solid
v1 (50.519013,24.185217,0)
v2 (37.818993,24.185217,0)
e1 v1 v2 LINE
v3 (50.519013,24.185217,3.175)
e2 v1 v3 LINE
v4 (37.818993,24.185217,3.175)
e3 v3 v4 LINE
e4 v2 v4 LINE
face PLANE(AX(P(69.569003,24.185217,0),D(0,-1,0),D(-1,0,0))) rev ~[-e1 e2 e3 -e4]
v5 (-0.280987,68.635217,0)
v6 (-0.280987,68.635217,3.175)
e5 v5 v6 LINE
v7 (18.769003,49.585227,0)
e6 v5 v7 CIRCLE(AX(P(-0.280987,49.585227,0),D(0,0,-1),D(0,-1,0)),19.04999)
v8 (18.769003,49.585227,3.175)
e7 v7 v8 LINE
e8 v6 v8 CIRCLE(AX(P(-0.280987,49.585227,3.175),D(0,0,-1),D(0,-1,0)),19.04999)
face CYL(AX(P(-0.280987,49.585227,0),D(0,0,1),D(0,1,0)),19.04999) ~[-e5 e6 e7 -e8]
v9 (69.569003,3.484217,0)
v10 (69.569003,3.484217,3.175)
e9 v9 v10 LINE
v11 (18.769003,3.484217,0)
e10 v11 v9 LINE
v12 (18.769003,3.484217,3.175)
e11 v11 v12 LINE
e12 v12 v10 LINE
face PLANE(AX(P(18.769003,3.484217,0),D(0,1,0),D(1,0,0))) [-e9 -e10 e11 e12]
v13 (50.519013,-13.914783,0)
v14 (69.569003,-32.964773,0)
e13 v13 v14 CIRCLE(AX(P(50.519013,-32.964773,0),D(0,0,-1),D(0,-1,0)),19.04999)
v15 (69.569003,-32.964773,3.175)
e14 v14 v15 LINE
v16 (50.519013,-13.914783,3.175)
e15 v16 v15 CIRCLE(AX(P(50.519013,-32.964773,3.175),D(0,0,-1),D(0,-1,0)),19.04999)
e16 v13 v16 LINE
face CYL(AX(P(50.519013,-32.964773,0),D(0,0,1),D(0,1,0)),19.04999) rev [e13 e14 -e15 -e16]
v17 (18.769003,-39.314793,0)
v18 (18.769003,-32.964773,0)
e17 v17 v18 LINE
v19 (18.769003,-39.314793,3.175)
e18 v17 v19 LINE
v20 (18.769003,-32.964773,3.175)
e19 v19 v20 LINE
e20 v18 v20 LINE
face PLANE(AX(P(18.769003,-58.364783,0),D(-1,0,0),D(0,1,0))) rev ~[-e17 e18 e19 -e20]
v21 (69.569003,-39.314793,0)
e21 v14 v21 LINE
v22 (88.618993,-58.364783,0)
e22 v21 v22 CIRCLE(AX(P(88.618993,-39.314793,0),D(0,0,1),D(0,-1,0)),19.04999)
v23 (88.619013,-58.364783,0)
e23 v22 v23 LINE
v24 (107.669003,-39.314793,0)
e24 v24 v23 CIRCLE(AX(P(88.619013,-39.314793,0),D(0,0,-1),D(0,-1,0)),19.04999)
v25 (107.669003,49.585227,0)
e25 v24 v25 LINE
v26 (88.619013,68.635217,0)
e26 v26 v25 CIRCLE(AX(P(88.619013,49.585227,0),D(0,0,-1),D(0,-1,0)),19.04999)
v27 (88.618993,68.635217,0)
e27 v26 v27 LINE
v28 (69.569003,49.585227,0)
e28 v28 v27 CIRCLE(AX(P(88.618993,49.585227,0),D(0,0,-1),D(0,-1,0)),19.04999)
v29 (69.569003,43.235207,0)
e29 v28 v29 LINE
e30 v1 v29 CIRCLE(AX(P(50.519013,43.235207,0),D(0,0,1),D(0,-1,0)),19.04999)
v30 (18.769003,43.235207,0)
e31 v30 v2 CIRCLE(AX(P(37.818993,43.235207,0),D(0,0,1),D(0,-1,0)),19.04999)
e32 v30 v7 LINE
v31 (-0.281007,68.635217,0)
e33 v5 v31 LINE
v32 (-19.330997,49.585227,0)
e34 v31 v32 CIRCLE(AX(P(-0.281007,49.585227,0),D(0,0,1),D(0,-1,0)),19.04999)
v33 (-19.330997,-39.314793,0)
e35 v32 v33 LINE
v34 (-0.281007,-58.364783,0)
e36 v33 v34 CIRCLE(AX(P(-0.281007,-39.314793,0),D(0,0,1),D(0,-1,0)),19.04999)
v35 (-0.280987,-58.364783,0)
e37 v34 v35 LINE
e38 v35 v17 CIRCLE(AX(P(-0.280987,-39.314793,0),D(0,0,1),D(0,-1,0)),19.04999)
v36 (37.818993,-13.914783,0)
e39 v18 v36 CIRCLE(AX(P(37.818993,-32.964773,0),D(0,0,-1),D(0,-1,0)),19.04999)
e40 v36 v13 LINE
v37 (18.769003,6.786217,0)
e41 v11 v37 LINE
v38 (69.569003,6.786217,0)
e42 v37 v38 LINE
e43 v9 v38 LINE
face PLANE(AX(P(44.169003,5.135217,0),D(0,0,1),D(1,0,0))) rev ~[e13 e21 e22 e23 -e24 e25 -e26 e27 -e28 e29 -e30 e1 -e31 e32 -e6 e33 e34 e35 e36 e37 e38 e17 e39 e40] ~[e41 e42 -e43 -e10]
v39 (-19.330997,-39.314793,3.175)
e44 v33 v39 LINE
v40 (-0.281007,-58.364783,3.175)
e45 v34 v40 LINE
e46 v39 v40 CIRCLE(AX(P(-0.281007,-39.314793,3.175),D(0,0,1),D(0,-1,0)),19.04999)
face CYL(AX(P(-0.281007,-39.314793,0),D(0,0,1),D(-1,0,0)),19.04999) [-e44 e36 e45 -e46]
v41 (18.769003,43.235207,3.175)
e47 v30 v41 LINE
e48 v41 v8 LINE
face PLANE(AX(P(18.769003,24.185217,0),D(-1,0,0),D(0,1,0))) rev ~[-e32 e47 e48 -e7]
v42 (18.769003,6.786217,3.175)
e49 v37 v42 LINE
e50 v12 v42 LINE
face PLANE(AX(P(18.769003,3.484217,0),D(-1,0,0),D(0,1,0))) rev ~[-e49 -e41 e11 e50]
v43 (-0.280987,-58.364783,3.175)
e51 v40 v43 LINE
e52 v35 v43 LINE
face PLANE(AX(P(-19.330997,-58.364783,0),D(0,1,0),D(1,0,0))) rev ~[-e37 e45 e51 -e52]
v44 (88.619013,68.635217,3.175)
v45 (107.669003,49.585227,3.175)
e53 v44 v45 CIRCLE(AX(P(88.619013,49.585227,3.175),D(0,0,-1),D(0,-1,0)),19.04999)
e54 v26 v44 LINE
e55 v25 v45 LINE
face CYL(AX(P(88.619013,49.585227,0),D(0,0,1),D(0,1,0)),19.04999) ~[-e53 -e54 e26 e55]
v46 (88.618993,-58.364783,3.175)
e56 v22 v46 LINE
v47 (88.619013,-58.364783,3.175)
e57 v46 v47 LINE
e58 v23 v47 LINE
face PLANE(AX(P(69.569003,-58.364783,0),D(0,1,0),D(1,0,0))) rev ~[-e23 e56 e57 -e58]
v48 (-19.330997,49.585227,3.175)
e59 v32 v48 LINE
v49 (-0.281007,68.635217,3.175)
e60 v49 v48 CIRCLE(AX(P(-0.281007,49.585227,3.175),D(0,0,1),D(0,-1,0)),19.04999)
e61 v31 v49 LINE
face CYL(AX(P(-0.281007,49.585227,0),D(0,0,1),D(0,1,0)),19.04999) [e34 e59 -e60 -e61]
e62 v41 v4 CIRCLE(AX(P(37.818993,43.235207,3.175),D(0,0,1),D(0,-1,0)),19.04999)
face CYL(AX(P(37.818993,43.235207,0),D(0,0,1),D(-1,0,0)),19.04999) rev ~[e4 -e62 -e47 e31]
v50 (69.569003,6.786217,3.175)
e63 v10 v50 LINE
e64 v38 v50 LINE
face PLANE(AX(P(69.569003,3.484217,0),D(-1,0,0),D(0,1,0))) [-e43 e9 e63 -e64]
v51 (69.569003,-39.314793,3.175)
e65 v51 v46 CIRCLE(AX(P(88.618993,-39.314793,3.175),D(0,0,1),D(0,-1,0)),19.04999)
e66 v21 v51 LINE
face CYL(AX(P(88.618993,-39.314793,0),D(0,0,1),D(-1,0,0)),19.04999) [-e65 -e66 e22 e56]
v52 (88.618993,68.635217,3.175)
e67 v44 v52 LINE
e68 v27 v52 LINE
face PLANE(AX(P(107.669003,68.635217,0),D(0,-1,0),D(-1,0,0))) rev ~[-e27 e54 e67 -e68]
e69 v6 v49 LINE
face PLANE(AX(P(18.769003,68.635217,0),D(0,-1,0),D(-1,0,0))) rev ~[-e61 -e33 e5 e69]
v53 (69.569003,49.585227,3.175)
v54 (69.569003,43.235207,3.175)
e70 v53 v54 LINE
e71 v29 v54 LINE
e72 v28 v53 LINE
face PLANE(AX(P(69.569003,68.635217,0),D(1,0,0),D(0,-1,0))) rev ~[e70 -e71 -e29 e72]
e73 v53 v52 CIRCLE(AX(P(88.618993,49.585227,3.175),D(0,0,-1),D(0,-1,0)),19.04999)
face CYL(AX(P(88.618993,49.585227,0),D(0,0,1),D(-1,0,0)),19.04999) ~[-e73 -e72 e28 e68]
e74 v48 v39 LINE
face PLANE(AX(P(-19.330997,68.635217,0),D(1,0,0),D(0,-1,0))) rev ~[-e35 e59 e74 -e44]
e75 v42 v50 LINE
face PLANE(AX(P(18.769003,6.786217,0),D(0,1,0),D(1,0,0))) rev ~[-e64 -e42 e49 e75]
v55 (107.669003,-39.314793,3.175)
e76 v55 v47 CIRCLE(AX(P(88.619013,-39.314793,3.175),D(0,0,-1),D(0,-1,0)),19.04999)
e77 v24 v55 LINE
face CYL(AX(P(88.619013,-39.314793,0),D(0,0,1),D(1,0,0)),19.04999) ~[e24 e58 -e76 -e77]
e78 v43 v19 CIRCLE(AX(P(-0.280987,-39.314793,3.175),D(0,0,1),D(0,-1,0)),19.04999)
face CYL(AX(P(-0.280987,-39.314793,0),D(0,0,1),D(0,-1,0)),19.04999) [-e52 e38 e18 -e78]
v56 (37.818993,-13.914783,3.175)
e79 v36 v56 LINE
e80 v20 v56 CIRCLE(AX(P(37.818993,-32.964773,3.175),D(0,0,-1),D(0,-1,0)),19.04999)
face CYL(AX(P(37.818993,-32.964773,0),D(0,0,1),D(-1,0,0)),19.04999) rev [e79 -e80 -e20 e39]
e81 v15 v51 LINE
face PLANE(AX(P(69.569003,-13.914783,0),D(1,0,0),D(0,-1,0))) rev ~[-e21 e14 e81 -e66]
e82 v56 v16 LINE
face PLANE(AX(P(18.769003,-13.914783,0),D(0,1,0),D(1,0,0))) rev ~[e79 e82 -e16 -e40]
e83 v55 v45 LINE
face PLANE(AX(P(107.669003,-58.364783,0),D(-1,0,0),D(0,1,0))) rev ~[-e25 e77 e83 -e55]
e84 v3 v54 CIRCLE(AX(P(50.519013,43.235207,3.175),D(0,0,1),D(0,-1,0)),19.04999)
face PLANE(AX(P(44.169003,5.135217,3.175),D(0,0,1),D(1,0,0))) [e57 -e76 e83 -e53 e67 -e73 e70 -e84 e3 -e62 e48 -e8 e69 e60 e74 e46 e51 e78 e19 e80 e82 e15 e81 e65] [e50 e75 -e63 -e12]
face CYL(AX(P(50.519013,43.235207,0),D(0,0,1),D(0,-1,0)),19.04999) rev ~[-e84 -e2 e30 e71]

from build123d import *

# Parameters (mm, degrees)
F0_W     = 50.8
F0_H     = 3.302
F1_DEPTH = 3.175
F2_R     = 19.04999


# Not quite as in the source:
# - a fillet or chamfer is up to 0.001 mm smaller than in the source, because OpenCascade refuses the exact size


with BuildPart() as f1:
    # F0 (on Top) → F1 (new body)
    with BuildSketch(Plane.XY):
        Polygon((18.769003178, 68.6352171788), (-19.330996822, 68.6352171788), (-19.330996822, -58.3647828212), (18.769003178, -58.3647828212), (18.769003178, -13.9147828212), (69.569003178, -13.9147828212), (69.569003178, -58.3647828212), (107.669003178, -58.3647828212), (107.669003178, 68.6352171788), (69.569003178, 68.6352171788), (69.569003178, 24.1852171788), (18.769003178, 24.1852171788), align=None)
        with Locations((44.169003178, 5.1352171788)):
            Rectangle(F0_W, F0_H, mode=Mode.SUBTRACT)
    extrude(amount=F1_DEPTH)

    # F2 (radius 19.05 in the source; OpenCascade refuses exactly that, so slightly less here)
    f2_edges = [f1.edges().sort_by_distance(p)[0] for p in [
        (18.769003, -58.364783, 1.5875),
        (-19.330997, -58.364783, 1.5875),
        (69.569003, -58.364783, 1.5875),
        (107.669003, -58.364783, 1.5875),
        (18.769003, -13.914783, 1.5875),
        (69.569003, -13.914783, 1.5875),
        (-19.330997, 68.635217, 1.5875),
        (18.769003, 68.635217, 1.5875),
        (69.569003, 24.185217, 1.5875),
        (69.569003, 68.635217, 1.5875),
        (107.669003, 68.635217, 1.5875),
        (18.769003, 24.185217, 1.5875),
    ]]
    fillet(f2_edges, radius=F2_R)


solid = f1.part
